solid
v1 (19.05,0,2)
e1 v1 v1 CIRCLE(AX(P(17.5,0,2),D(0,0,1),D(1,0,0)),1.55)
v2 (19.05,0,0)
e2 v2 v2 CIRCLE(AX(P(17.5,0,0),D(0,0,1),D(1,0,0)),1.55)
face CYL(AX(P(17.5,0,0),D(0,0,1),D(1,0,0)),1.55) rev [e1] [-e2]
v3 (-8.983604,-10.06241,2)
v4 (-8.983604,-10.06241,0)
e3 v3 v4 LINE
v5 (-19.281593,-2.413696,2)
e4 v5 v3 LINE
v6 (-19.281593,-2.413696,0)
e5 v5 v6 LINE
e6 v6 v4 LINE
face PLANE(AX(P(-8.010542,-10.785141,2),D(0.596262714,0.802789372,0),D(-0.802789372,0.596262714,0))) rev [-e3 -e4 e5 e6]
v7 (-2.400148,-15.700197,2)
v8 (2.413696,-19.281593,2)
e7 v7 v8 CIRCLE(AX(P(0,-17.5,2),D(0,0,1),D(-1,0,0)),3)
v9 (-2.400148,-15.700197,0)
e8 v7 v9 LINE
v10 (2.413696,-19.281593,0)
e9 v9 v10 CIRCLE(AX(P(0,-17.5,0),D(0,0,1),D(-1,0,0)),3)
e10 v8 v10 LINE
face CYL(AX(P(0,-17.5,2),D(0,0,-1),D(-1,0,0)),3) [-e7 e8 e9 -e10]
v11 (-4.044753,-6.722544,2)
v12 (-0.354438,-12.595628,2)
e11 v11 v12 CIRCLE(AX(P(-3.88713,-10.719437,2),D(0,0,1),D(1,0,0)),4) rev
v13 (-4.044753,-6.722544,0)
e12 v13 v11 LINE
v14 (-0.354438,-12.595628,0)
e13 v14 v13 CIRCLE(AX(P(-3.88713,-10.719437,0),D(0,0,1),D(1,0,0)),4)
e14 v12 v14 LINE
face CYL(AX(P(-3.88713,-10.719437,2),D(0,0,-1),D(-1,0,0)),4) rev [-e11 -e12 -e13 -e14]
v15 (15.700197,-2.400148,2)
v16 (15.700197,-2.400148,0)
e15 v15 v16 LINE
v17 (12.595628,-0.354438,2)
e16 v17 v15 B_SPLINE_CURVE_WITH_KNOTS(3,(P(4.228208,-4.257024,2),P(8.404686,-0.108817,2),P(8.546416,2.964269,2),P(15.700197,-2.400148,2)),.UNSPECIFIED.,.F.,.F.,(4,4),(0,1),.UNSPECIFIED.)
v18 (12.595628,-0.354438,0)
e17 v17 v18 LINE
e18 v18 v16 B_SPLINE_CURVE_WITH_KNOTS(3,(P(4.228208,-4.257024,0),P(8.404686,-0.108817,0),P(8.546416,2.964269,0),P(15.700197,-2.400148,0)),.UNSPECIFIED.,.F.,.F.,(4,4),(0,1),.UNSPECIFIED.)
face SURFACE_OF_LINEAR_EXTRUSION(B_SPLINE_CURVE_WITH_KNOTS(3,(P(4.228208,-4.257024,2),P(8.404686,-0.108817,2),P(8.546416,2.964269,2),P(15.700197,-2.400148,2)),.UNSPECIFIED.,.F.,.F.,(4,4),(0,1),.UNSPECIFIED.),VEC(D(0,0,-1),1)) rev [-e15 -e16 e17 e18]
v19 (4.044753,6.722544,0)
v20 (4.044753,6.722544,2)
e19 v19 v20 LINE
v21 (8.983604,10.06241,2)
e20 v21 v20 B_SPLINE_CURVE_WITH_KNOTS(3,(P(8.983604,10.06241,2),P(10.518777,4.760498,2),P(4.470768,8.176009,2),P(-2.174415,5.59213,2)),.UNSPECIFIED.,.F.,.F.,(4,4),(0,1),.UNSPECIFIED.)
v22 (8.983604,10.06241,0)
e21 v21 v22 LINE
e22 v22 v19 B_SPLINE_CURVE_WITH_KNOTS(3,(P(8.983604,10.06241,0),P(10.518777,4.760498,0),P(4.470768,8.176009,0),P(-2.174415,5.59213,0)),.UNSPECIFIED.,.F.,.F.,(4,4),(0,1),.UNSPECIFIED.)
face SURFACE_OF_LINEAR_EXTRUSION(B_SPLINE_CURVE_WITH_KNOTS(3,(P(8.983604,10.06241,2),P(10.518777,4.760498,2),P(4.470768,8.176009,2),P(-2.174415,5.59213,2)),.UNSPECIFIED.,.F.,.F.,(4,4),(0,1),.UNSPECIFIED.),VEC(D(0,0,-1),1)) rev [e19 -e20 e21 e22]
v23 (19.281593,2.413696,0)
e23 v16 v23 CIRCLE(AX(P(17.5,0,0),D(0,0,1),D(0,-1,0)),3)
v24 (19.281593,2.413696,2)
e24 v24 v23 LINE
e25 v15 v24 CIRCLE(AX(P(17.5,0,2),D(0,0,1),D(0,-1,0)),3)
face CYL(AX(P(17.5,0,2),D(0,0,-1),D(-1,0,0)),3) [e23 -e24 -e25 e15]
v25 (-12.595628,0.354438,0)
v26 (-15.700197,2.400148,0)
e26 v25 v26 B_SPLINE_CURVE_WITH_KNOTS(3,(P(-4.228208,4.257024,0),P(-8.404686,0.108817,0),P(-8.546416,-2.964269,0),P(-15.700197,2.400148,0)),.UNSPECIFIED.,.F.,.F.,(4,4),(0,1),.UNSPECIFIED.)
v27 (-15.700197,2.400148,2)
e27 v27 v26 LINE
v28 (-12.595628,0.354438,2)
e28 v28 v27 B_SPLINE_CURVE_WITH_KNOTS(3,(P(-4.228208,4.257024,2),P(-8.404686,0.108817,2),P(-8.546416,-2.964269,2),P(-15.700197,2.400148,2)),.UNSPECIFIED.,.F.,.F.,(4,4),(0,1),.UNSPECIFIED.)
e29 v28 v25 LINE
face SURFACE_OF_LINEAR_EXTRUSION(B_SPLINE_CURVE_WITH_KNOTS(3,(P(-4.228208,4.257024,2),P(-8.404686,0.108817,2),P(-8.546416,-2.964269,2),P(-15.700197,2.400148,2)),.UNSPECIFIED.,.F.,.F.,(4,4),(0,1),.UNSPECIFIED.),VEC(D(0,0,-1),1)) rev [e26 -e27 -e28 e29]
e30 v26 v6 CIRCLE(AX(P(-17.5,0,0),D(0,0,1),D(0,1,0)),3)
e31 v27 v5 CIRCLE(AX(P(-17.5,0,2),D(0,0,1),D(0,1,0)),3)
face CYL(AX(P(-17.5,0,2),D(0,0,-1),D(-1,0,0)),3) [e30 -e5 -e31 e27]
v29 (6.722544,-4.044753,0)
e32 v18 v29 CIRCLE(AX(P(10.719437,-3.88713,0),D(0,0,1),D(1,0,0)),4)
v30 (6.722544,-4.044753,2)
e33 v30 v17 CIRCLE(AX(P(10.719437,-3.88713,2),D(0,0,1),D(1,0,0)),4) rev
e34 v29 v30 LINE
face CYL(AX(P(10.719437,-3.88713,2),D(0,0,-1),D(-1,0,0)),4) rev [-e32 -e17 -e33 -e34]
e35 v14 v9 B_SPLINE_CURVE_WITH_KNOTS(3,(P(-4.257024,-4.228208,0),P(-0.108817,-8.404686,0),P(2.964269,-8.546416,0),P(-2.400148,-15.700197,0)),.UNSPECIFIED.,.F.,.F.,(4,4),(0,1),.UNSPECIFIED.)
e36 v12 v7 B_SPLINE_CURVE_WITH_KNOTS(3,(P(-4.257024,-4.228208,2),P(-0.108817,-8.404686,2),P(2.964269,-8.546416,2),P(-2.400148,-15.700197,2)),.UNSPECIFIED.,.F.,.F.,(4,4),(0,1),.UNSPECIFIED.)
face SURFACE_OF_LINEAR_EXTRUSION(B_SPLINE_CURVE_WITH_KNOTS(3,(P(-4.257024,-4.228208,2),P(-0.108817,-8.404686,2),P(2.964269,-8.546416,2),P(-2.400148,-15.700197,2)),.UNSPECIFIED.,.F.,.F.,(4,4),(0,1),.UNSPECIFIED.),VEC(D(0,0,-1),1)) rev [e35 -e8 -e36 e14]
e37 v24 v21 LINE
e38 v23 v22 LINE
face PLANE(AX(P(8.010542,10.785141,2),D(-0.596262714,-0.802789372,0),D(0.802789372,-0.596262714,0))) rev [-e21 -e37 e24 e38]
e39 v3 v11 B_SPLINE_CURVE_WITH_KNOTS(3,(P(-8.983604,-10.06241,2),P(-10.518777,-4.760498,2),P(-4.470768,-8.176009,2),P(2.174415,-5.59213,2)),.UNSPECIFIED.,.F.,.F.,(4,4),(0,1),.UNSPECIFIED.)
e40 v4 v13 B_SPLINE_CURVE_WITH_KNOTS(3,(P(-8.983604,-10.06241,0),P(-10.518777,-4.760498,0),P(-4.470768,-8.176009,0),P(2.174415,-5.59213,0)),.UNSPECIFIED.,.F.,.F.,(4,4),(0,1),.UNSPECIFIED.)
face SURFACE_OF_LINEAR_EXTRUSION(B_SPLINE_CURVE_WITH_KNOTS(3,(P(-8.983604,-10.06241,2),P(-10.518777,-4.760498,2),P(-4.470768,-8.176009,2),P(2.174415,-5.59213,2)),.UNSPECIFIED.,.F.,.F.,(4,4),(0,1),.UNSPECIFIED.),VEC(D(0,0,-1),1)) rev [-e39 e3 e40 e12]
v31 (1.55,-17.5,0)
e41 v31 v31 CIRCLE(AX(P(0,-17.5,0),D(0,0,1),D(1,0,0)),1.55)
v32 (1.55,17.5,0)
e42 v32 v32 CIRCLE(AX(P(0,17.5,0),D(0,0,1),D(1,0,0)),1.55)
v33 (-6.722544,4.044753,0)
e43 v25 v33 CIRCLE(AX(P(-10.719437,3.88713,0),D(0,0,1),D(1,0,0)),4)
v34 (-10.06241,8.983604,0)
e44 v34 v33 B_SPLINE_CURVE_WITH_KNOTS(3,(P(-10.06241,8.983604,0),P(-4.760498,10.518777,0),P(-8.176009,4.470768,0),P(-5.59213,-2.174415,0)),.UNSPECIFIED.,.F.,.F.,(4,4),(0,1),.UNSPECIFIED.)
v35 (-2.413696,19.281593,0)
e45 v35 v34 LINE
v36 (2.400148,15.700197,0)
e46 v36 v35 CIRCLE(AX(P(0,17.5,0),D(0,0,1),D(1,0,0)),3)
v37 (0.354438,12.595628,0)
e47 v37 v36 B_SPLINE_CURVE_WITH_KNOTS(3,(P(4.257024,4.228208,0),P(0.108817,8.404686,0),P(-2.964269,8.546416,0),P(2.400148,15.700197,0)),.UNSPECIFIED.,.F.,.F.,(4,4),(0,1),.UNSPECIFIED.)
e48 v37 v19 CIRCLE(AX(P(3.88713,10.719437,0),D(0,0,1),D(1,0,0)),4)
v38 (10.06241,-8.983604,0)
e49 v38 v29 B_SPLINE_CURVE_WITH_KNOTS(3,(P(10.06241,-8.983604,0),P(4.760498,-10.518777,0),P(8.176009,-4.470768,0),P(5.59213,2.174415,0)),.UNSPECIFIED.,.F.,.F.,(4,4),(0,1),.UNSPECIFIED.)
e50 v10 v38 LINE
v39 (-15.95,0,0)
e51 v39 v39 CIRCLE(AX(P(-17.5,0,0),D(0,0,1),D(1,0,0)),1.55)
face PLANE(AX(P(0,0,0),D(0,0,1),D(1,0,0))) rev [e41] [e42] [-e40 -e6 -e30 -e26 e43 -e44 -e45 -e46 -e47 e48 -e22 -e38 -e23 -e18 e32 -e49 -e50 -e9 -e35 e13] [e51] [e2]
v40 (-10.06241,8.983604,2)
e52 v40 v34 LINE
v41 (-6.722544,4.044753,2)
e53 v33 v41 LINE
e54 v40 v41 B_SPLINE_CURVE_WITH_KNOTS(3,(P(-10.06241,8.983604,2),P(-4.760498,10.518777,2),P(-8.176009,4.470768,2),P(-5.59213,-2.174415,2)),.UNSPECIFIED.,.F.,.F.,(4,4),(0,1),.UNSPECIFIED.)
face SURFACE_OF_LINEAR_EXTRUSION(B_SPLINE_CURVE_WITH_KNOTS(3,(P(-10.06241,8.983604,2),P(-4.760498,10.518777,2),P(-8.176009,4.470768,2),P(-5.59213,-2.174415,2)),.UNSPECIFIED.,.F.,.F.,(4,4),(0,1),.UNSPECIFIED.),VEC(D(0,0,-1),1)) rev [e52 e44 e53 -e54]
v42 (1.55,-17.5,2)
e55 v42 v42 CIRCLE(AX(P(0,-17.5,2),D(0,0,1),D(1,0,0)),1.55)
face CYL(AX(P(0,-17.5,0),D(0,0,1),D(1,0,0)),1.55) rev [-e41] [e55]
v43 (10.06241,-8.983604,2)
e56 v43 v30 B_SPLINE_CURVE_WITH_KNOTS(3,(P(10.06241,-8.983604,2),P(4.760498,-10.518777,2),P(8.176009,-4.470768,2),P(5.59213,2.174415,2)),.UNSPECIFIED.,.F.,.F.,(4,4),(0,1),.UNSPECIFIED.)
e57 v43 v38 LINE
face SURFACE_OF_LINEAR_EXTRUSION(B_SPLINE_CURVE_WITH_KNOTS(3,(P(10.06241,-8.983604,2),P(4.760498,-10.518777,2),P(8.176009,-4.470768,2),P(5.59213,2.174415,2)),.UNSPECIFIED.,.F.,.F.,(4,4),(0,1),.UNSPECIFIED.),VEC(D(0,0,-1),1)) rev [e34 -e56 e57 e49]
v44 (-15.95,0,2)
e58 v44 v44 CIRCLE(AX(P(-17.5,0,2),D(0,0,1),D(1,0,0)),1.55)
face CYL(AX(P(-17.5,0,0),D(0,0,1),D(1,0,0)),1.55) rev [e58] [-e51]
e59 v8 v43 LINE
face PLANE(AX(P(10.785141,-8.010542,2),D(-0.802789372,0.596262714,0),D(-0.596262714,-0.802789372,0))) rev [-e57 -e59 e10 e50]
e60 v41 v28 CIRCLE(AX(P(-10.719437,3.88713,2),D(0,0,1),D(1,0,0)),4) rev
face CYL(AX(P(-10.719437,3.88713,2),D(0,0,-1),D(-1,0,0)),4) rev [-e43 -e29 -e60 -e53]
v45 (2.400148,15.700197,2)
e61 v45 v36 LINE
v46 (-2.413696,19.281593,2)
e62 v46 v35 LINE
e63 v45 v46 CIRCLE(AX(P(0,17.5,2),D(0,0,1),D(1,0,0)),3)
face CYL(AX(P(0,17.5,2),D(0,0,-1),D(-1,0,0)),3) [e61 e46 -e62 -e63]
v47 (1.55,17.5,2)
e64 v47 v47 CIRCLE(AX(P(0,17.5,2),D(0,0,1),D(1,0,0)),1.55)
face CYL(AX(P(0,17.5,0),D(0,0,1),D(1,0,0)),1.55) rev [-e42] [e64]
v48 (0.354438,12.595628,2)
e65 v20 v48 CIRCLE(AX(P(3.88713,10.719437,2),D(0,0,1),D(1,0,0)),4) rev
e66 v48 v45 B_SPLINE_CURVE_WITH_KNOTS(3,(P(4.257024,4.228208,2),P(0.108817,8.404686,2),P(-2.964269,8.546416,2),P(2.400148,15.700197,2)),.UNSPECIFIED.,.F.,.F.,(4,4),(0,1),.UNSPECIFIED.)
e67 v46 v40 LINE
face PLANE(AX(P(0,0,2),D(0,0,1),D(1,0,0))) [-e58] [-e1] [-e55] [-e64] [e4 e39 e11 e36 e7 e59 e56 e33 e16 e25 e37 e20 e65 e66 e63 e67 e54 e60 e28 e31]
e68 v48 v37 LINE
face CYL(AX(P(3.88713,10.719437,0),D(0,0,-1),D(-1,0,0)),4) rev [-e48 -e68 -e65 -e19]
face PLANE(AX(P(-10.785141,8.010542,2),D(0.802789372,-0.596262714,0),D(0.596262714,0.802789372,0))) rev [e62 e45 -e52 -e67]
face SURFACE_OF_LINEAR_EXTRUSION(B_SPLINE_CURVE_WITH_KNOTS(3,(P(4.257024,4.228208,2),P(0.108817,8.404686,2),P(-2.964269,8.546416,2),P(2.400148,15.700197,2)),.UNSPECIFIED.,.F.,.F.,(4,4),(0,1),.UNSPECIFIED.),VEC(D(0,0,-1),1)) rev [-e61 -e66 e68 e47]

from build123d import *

# Parameters (mm, degrees)
SZKIC1_R                    = 3
SZKIC1_R_2                  = 6
DODANIE_WYCI_GNI_CIE1_DEPTH = 2
SZYK_KO_OWY1_COUNT          = 4
ZAOKR_GLENIE1_DEPTH         = 2
SZKIC2_R                    = 1.55
WYTNIJ_WYCI_GNI_CIE1_DEPTH  = 30.060282321


with BuildPart() as part:
    # Szkic1 → Dodanie-wyciągnięcie1 (new body)
    with BuildSketch(Plane.XY):
        with BuildLine():
            ThreePointArc((2.400147918, 15.700197241), (-1.790710564, 15.093060932), (-2.413695775, 19.281592745))
            Line((-2.413695775, 19.281592745), (-10.062410419, 8.983603822))
            add(Edge.make_bspline(
                [(-10.062410419, 8.983603822), (-4.760498221, 10.518777319), (-8.176009399, 4.470768002), (-5.592129953, -2.174415459)],
                knots=[0, 0, 0, 0, 1, 1, 1, 1], degree=3))
            ThreePointArc((-5.592129953, -2.174415459), (-3.27017187, 5.030504541), (4.257024291, 4.228208153))
            add(Edge.make_bspline(
                [(4.257024291, 4.228208153), (0.108817482, 8.404685875), (-2.964269427, 8.546416052), (2.400147918, 15.700197241)],
                knots=[0, 0, 0, 0, 1, 1, 1, 1], degree=3))
        make_face()
        with Locations((0, 17.5)):
            Circle(SZKIC1_R)
        Circle(SZKIC1_R_2)
    dodanie_wyci_gni_cie1 = extrude(amount=DODANIE_WYCI_GNI_CIE1_DEPTH)

    # Szyk kołowy1: Dodanie-wyciągnięcie1 ×4 about axis
    szyk_ko_owy1_axis = Axis((0, 0, 0), (0, 0, -1))
    for i in range(1, SZYK_KO_OWY1_COUNT):
        add(dodanie_wyci_gni_cie1.rotate(szyk_ko_owy1_axis, i * 360 / SZYK_KO_OWY1_COUNT))

    # Zaokrąglenie1: read off the stored shape, not the designer's step
    # Zaokrąglenie1 outline → Zaokrąglenie1 (add)
    with BuildSketch(Plane.XY):
        with BuildLine():
            add(Edge.make_bspline(
                [(-6.722543952, 4.044752518), (-6.693847694, 3.317092727), (-6.646227592, 2.537215945), (-6.544838162, 1.721663177)],
                knots=[0.664728108, 0.664728108, 0.664728108, 0.664728108, 0.79801197, 0.79801197, 0.79801197, 0.79801197], degree=3))
            ThreePointArc((-6.722543952, 4.044752518), (-8.59130438, 0.500235564), (-12.595628187, 0.354438378))
            add(Edge.make_bspline(
                [(-6.544838162, 1.721663177), (-8.318139153, -0.279379709), (-9.515072999, -1.281625971), (-12.595628187, 0.354438378)],
                knots=[0.223227171, 0.223227171, 0.223227171, 0.223227171, 0.829356845, 0.829356845, 0.829356845, 0.829356845], degree=3))
        make_face()
        with BuildLine():
            add(Edge.make_bspline(
                [(-4.044752518, -6.722543952), (-3.317092725, -6.693847694), (-2.537215942, -6.646227592), (-1.721663172, -6.544838162)],
                knots=[0.664728108, 0.664728108, 0.664728108, 0.664728108, 0.79801197, 0.79801197, 0.79801197, 0.79801197], degree=3))
            ThreePointArc((-4.044752518, -6.722543952), (-0.500235564, -8.59130438), (-0.354438378, -12.595628187))
            add(Edge.make_bspline(
                [(-1.721663172, -6.544838162), (0.279379709, -8.318139153), (1.281625971, -9.515072999), (-0.354438378, -12.595628187)],
                knots=[0.223227171, 0.223227171, 0.223227171, 0.223227171, 0.829356845, 0.829356845, 0.829356845, 0.829356845], degree=3))
        make_face()
        with BuildLine():
            add(Edge.make_bspline(
                [(6.722543952, -4.044752518), (6.693847694, -3.317092727), (6.646227592, -2.537215945), (6.544838162, -1.721663177)],
                knots=[0.664728108, 0.664728108, 0.664728108, 0.664728108, 0.79801197, 0.79801197, 0.79801197, 0.79801197], degree=3))
            ThreePointArc((6.722543952, -4.044752518), (8.59130438, -0.500235564), (12.595628187, -0.354438378))
            add(Edge.make_bspline(
                [(6.544838162, -1.721663177), (8.318139153, 0.279379709), (9.515072999, 1.281625971), (12.595628187, -0.354438378)],
                knots=[0.223227171, 0.223227171, 0.223227171, 0.223227171, 0.829356845, 0.829356845, 0.829356845, 0.829356845], degree=3))
        make_face()
        with BuildLine():
            add(Edge.make_bspline(
                [(4.044752518, 6.722543952), (3.317092727, 6.693847694), (2.537215945, 6.646227592), (1.721663177, 6.544838162)],
                knots=[0.664728108, 0.664728108, 0.664728108, 0.664728108, 0.79801197, 0.79801197, 0.79801197, 0.79801197], degree=3))
            ThreePointArc((4.044752518, 6.722543952), (0.500235564, 8.59130438), (0.354438378, 12.595628187))
            add(Edge.make_bspline(
                [(1.721663177, 6.544838162), (-0.279379709, 8.318139153), (-1.281625971, 9.515072999), (0.354438378, 12.595628187)],
                knots=[0.223227171, 0.223227171, 0.223227171, 0.223227171, 0.829356845, 0.829356845, 0.829356845, 0.829356845], degree=3))
        make_face()
    extrude(amount=ZAOKR_GLENIE1_DEPTH)

    # Szkic2 → Wytnij-wyciągnięcie1 (cut, through all)
    with BuildSketch(Plane.XY.offset(2)):
        with Locations((0, 17.5)):
            Circle(SZKIC2_R)
        with Locations((17.5, 0)):
            Circle(SZKIC2_R)
        with Locations((0, -17.5)):
            Circle(SZKIC2_R)
        with Locations((-17.5, 0)):
            Circle(SZKIC2_R)
    extrude(amount=-WYTNIJ_WYCI_GNI_CIE1_DEPTH, mode=Mode.SUBTRACT)


solid = part.part
